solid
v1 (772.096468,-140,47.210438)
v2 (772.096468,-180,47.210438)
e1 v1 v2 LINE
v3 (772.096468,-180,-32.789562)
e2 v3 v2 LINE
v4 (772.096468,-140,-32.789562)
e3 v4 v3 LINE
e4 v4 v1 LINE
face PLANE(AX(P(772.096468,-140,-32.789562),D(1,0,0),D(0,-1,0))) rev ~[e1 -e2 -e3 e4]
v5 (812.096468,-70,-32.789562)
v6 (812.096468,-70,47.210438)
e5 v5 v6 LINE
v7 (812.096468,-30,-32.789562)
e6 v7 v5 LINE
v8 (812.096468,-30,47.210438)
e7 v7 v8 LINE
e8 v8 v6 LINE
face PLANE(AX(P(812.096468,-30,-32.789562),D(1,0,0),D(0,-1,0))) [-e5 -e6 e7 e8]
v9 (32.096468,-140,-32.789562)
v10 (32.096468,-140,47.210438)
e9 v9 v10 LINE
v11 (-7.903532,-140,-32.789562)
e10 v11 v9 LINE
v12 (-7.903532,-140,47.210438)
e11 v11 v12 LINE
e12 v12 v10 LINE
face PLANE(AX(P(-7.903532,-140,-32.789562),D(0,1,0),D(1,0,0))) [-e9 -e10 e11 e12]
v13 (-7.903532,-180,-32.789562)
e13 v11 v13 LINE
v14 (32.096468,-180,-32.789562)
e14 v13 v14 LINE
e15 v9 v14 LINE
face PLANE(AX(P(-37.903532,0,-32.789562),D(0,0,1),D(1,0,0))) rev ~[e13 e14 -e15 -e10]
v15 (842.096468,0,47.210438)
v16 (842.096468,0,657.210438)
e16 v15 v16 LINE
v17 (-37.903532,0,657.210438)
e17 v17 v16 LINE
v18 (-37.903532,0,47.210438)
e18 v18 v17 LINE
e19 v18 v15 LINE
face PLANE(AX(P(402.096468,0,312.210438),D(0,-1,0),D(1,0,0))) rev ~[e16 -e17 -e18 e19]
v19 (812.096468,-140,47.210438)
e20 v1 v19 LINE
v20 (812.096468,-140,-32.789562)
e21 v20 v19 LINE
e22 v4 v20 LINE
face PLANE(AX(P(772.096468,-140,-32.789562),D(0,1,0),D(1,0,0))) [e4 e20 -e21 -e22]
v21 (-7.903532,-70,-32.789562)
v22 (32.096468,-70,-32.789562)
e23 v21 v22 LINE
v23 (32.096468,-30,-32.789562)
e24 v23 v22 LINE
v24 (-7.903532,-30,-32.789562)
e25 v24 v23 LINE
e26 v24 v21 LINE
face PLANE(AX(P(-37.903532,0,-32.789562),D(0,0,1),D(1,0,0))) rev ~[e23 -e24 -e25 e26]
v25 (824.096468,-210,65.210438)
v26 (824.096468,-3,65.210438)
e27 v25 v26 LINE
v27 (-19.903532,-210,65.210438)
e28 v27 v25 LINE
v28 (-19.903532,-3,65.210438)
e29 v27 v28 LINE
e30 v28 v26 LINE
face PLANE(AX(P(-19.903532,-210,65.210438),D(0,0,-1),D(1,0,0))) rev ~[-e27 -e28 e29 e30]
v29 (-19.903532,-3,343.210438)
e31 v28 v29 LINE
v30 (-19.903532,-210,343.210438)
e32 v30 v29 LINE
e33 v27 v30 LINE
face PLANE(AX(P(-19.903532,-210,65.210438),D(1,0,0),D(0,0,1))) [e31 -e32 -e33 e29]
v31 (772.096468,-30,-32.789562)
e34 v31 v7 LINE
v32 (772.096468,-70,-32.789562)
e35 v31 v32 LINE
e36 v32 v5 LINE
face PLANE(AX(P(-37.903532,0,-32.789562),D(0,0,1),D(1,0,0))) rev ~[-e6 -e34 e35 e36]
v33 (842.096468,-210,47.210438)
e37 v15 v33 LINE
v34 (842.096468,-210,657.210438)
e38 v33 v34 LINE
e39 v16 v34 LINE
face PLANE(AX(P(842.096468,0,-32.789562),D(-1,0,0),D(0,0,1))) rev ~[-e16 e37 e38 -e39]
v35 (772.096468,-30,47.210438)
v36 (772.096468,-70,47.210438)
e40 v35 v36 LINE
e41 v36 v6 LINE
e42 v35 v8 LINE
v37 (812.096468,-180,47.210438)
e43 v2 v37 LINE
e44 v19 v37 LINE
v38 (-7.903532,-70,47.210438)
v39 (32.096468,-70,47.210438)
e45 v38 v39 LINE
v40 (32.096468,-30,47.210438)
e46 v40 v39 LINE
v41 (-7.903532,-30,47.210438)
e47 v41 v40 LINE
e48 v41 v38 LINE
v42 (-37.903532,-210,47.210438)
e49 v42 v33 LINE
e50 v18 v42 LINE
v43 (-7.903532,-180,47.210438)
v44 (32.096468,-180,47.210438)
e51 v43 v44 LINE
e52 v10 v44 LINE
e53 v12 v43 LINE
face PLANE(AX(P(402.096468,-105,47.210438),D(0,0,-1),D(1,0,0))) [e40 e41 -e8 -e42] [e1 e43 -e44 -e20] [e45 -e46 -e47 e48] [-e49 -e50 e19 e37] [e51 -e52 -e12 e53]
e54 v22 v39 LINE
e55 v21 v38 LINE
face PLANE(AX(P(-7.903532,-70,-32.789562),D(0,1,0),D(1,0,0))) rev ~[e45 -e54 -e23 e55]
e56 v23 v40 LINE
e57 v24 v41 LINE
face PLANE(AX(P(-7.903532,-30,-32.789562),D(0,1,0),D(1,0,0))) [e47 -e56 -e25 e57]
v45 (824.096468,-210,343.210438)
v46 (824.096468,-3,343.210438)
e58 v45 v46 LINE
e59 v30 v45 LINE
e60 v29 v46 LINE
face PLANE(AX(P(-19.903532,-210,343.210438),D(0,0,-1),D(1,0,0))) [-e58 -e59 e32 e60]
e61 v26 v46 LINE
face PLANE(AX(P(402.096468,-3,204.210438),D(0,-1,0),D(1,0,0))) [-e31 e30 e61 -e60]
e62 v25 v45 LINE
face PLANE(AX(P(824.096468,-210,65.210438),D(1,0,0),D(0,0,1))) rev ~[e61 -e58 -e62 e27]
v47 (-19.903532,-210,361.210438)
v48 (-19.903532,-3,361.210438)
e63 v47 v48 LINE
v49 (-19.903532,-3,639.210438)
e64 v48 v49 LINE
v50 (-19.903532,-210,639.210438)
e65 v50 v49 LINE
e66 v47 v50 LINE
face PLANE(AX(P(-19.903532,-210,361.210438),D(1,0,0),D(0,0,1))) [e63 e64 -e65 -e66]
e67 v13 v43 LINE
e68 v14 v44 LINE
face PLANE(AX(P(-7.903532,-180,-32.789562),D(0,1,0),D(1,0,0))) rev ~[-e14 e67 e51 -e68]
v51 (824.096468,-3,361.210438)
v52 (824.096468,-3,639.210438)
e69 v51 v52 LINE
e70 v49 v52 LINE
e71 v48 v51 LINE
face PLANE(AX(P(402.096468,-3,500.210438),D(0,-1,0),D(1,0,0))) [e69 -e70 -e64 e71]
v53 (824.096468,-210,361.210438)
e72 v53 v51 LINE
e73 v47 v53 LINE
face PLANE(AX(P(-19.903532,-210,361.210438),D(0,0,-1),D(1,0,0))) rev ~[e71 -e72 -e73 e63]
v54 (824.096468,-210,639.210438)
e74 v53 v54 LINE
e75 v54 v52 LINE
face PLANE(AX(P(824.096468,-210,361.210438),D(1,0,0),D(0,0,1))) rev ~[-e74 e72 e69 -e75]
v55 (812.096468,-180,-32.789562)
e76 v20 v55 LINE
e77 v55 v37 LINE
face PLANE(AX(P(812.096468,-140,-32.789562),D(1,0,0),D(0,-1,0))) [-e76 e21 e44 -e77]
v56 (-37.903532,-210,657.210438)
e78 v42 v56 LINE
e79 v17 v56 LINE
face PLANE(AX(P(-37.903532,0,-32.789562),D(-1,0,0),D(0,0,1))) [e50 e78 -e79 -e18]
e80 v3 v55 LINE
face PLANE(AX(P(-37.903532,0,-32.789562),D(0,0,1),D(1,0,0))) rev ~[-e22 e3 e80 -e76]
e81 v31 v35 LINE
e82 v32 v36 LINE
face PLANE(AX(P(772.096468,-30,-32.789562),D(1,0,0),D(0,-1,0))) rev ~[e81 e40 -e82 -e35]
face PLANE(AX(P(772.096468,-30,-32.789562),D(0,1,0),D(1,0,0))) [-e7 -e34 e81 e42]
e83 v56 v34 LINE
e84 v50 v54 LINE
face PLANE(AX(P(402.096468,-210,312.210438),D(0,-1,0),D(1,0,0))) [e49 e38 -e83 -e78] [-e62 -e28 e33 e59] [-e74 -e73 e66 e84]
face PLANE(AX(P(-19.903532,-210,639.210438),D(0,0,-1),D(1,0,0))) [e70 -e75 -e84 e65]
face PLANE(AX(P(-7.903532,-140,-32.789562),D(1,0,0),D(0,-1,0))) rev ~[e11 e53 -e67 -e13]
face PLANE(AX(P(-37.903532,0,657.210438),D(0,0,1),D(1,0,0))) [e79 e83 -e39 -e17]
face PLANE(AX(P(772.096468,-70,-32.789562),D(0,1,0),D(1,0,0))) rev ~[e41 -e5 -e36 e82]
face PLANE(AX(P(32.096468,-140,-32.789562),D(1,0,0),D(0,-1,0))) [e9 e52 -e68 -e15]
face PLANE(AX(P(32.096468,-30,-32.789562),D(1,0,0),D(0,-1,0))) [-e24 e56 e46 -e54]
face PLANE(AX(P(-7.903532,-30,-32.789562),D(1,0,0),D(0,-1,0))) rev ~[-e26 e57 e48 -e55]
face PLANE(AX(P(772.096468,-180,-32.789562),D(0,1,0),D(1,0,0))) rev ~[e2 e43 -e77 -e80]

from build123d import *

# Parameters (mm, degrees)
F0_W     = 880
F0_H     = 690
F1_DEPTH = 210
F2_W     = 880
F2_H     = 210
F2_W_2   = 40
F2_H_2   = 40
F3_DEPTH = 80
F4_W     = 844
F4_H     = 278
F5_DEPTH = 207


# Not quite as in the source:
# - a feature names something its author has since deleted; it is built from what else it names


with BuildPart() as f1:
    # F0 (on Front) → F1 (new body)
    with BuildSketch(Plane.XZ):
        with Locations((402.0964676142, 312.2104381025)):
            Rectangle(F0_W, F0_H)
    extrude(amount=F1_DEPTH)

    # F2 (on face) → F3 (cut)
    with BuildSketch(Plane(origin=(0, 0, -32.7895618975), x_dir=(1, 0, 0), z_dir=(0, 0, -1))):
        with Locations((402.0964676142, 105)):
            Rectangle(F2_W, F2_H)
        with Locations((12.0964676142, 50)):
            Rectangle(F2_W_2, F2_H_2, mode=Mode.SUBTRACT)
        with Locations((792.0964676142, 50)):
            Rectangle(F2_W_2, F2_H_2, mode=Mode.SUBTRACT)
        with Locations((12.0964676142, 160)):
            Rectangle(F2_W_2, F2_H_2, mode=Mode.SUBTRACT)
        with Locations((792.0964676142, 160)):
            Rectangle(F2_W_2, F2_H_2, mode=Mode.SUBTRACT)
    extrude(amount=-F3_DEPTH, mode=Mode.SUBTRACT)

    # F4 (on face) → F5 (cut, through all)
    with BuildSketch(Plane.XZ.offset(210)):
        with Locations((402.0964676142, 500.2104381025)):
            Rectangle(F4_W, F4_H)
        with Locations((402.0964676142, 204.2104381025)):
            Rectangle(F4_W, F4_H)
    extrude(amount=-F5_DEPTH, mode=Mode.SUBTRACT)


solid = f1.part
